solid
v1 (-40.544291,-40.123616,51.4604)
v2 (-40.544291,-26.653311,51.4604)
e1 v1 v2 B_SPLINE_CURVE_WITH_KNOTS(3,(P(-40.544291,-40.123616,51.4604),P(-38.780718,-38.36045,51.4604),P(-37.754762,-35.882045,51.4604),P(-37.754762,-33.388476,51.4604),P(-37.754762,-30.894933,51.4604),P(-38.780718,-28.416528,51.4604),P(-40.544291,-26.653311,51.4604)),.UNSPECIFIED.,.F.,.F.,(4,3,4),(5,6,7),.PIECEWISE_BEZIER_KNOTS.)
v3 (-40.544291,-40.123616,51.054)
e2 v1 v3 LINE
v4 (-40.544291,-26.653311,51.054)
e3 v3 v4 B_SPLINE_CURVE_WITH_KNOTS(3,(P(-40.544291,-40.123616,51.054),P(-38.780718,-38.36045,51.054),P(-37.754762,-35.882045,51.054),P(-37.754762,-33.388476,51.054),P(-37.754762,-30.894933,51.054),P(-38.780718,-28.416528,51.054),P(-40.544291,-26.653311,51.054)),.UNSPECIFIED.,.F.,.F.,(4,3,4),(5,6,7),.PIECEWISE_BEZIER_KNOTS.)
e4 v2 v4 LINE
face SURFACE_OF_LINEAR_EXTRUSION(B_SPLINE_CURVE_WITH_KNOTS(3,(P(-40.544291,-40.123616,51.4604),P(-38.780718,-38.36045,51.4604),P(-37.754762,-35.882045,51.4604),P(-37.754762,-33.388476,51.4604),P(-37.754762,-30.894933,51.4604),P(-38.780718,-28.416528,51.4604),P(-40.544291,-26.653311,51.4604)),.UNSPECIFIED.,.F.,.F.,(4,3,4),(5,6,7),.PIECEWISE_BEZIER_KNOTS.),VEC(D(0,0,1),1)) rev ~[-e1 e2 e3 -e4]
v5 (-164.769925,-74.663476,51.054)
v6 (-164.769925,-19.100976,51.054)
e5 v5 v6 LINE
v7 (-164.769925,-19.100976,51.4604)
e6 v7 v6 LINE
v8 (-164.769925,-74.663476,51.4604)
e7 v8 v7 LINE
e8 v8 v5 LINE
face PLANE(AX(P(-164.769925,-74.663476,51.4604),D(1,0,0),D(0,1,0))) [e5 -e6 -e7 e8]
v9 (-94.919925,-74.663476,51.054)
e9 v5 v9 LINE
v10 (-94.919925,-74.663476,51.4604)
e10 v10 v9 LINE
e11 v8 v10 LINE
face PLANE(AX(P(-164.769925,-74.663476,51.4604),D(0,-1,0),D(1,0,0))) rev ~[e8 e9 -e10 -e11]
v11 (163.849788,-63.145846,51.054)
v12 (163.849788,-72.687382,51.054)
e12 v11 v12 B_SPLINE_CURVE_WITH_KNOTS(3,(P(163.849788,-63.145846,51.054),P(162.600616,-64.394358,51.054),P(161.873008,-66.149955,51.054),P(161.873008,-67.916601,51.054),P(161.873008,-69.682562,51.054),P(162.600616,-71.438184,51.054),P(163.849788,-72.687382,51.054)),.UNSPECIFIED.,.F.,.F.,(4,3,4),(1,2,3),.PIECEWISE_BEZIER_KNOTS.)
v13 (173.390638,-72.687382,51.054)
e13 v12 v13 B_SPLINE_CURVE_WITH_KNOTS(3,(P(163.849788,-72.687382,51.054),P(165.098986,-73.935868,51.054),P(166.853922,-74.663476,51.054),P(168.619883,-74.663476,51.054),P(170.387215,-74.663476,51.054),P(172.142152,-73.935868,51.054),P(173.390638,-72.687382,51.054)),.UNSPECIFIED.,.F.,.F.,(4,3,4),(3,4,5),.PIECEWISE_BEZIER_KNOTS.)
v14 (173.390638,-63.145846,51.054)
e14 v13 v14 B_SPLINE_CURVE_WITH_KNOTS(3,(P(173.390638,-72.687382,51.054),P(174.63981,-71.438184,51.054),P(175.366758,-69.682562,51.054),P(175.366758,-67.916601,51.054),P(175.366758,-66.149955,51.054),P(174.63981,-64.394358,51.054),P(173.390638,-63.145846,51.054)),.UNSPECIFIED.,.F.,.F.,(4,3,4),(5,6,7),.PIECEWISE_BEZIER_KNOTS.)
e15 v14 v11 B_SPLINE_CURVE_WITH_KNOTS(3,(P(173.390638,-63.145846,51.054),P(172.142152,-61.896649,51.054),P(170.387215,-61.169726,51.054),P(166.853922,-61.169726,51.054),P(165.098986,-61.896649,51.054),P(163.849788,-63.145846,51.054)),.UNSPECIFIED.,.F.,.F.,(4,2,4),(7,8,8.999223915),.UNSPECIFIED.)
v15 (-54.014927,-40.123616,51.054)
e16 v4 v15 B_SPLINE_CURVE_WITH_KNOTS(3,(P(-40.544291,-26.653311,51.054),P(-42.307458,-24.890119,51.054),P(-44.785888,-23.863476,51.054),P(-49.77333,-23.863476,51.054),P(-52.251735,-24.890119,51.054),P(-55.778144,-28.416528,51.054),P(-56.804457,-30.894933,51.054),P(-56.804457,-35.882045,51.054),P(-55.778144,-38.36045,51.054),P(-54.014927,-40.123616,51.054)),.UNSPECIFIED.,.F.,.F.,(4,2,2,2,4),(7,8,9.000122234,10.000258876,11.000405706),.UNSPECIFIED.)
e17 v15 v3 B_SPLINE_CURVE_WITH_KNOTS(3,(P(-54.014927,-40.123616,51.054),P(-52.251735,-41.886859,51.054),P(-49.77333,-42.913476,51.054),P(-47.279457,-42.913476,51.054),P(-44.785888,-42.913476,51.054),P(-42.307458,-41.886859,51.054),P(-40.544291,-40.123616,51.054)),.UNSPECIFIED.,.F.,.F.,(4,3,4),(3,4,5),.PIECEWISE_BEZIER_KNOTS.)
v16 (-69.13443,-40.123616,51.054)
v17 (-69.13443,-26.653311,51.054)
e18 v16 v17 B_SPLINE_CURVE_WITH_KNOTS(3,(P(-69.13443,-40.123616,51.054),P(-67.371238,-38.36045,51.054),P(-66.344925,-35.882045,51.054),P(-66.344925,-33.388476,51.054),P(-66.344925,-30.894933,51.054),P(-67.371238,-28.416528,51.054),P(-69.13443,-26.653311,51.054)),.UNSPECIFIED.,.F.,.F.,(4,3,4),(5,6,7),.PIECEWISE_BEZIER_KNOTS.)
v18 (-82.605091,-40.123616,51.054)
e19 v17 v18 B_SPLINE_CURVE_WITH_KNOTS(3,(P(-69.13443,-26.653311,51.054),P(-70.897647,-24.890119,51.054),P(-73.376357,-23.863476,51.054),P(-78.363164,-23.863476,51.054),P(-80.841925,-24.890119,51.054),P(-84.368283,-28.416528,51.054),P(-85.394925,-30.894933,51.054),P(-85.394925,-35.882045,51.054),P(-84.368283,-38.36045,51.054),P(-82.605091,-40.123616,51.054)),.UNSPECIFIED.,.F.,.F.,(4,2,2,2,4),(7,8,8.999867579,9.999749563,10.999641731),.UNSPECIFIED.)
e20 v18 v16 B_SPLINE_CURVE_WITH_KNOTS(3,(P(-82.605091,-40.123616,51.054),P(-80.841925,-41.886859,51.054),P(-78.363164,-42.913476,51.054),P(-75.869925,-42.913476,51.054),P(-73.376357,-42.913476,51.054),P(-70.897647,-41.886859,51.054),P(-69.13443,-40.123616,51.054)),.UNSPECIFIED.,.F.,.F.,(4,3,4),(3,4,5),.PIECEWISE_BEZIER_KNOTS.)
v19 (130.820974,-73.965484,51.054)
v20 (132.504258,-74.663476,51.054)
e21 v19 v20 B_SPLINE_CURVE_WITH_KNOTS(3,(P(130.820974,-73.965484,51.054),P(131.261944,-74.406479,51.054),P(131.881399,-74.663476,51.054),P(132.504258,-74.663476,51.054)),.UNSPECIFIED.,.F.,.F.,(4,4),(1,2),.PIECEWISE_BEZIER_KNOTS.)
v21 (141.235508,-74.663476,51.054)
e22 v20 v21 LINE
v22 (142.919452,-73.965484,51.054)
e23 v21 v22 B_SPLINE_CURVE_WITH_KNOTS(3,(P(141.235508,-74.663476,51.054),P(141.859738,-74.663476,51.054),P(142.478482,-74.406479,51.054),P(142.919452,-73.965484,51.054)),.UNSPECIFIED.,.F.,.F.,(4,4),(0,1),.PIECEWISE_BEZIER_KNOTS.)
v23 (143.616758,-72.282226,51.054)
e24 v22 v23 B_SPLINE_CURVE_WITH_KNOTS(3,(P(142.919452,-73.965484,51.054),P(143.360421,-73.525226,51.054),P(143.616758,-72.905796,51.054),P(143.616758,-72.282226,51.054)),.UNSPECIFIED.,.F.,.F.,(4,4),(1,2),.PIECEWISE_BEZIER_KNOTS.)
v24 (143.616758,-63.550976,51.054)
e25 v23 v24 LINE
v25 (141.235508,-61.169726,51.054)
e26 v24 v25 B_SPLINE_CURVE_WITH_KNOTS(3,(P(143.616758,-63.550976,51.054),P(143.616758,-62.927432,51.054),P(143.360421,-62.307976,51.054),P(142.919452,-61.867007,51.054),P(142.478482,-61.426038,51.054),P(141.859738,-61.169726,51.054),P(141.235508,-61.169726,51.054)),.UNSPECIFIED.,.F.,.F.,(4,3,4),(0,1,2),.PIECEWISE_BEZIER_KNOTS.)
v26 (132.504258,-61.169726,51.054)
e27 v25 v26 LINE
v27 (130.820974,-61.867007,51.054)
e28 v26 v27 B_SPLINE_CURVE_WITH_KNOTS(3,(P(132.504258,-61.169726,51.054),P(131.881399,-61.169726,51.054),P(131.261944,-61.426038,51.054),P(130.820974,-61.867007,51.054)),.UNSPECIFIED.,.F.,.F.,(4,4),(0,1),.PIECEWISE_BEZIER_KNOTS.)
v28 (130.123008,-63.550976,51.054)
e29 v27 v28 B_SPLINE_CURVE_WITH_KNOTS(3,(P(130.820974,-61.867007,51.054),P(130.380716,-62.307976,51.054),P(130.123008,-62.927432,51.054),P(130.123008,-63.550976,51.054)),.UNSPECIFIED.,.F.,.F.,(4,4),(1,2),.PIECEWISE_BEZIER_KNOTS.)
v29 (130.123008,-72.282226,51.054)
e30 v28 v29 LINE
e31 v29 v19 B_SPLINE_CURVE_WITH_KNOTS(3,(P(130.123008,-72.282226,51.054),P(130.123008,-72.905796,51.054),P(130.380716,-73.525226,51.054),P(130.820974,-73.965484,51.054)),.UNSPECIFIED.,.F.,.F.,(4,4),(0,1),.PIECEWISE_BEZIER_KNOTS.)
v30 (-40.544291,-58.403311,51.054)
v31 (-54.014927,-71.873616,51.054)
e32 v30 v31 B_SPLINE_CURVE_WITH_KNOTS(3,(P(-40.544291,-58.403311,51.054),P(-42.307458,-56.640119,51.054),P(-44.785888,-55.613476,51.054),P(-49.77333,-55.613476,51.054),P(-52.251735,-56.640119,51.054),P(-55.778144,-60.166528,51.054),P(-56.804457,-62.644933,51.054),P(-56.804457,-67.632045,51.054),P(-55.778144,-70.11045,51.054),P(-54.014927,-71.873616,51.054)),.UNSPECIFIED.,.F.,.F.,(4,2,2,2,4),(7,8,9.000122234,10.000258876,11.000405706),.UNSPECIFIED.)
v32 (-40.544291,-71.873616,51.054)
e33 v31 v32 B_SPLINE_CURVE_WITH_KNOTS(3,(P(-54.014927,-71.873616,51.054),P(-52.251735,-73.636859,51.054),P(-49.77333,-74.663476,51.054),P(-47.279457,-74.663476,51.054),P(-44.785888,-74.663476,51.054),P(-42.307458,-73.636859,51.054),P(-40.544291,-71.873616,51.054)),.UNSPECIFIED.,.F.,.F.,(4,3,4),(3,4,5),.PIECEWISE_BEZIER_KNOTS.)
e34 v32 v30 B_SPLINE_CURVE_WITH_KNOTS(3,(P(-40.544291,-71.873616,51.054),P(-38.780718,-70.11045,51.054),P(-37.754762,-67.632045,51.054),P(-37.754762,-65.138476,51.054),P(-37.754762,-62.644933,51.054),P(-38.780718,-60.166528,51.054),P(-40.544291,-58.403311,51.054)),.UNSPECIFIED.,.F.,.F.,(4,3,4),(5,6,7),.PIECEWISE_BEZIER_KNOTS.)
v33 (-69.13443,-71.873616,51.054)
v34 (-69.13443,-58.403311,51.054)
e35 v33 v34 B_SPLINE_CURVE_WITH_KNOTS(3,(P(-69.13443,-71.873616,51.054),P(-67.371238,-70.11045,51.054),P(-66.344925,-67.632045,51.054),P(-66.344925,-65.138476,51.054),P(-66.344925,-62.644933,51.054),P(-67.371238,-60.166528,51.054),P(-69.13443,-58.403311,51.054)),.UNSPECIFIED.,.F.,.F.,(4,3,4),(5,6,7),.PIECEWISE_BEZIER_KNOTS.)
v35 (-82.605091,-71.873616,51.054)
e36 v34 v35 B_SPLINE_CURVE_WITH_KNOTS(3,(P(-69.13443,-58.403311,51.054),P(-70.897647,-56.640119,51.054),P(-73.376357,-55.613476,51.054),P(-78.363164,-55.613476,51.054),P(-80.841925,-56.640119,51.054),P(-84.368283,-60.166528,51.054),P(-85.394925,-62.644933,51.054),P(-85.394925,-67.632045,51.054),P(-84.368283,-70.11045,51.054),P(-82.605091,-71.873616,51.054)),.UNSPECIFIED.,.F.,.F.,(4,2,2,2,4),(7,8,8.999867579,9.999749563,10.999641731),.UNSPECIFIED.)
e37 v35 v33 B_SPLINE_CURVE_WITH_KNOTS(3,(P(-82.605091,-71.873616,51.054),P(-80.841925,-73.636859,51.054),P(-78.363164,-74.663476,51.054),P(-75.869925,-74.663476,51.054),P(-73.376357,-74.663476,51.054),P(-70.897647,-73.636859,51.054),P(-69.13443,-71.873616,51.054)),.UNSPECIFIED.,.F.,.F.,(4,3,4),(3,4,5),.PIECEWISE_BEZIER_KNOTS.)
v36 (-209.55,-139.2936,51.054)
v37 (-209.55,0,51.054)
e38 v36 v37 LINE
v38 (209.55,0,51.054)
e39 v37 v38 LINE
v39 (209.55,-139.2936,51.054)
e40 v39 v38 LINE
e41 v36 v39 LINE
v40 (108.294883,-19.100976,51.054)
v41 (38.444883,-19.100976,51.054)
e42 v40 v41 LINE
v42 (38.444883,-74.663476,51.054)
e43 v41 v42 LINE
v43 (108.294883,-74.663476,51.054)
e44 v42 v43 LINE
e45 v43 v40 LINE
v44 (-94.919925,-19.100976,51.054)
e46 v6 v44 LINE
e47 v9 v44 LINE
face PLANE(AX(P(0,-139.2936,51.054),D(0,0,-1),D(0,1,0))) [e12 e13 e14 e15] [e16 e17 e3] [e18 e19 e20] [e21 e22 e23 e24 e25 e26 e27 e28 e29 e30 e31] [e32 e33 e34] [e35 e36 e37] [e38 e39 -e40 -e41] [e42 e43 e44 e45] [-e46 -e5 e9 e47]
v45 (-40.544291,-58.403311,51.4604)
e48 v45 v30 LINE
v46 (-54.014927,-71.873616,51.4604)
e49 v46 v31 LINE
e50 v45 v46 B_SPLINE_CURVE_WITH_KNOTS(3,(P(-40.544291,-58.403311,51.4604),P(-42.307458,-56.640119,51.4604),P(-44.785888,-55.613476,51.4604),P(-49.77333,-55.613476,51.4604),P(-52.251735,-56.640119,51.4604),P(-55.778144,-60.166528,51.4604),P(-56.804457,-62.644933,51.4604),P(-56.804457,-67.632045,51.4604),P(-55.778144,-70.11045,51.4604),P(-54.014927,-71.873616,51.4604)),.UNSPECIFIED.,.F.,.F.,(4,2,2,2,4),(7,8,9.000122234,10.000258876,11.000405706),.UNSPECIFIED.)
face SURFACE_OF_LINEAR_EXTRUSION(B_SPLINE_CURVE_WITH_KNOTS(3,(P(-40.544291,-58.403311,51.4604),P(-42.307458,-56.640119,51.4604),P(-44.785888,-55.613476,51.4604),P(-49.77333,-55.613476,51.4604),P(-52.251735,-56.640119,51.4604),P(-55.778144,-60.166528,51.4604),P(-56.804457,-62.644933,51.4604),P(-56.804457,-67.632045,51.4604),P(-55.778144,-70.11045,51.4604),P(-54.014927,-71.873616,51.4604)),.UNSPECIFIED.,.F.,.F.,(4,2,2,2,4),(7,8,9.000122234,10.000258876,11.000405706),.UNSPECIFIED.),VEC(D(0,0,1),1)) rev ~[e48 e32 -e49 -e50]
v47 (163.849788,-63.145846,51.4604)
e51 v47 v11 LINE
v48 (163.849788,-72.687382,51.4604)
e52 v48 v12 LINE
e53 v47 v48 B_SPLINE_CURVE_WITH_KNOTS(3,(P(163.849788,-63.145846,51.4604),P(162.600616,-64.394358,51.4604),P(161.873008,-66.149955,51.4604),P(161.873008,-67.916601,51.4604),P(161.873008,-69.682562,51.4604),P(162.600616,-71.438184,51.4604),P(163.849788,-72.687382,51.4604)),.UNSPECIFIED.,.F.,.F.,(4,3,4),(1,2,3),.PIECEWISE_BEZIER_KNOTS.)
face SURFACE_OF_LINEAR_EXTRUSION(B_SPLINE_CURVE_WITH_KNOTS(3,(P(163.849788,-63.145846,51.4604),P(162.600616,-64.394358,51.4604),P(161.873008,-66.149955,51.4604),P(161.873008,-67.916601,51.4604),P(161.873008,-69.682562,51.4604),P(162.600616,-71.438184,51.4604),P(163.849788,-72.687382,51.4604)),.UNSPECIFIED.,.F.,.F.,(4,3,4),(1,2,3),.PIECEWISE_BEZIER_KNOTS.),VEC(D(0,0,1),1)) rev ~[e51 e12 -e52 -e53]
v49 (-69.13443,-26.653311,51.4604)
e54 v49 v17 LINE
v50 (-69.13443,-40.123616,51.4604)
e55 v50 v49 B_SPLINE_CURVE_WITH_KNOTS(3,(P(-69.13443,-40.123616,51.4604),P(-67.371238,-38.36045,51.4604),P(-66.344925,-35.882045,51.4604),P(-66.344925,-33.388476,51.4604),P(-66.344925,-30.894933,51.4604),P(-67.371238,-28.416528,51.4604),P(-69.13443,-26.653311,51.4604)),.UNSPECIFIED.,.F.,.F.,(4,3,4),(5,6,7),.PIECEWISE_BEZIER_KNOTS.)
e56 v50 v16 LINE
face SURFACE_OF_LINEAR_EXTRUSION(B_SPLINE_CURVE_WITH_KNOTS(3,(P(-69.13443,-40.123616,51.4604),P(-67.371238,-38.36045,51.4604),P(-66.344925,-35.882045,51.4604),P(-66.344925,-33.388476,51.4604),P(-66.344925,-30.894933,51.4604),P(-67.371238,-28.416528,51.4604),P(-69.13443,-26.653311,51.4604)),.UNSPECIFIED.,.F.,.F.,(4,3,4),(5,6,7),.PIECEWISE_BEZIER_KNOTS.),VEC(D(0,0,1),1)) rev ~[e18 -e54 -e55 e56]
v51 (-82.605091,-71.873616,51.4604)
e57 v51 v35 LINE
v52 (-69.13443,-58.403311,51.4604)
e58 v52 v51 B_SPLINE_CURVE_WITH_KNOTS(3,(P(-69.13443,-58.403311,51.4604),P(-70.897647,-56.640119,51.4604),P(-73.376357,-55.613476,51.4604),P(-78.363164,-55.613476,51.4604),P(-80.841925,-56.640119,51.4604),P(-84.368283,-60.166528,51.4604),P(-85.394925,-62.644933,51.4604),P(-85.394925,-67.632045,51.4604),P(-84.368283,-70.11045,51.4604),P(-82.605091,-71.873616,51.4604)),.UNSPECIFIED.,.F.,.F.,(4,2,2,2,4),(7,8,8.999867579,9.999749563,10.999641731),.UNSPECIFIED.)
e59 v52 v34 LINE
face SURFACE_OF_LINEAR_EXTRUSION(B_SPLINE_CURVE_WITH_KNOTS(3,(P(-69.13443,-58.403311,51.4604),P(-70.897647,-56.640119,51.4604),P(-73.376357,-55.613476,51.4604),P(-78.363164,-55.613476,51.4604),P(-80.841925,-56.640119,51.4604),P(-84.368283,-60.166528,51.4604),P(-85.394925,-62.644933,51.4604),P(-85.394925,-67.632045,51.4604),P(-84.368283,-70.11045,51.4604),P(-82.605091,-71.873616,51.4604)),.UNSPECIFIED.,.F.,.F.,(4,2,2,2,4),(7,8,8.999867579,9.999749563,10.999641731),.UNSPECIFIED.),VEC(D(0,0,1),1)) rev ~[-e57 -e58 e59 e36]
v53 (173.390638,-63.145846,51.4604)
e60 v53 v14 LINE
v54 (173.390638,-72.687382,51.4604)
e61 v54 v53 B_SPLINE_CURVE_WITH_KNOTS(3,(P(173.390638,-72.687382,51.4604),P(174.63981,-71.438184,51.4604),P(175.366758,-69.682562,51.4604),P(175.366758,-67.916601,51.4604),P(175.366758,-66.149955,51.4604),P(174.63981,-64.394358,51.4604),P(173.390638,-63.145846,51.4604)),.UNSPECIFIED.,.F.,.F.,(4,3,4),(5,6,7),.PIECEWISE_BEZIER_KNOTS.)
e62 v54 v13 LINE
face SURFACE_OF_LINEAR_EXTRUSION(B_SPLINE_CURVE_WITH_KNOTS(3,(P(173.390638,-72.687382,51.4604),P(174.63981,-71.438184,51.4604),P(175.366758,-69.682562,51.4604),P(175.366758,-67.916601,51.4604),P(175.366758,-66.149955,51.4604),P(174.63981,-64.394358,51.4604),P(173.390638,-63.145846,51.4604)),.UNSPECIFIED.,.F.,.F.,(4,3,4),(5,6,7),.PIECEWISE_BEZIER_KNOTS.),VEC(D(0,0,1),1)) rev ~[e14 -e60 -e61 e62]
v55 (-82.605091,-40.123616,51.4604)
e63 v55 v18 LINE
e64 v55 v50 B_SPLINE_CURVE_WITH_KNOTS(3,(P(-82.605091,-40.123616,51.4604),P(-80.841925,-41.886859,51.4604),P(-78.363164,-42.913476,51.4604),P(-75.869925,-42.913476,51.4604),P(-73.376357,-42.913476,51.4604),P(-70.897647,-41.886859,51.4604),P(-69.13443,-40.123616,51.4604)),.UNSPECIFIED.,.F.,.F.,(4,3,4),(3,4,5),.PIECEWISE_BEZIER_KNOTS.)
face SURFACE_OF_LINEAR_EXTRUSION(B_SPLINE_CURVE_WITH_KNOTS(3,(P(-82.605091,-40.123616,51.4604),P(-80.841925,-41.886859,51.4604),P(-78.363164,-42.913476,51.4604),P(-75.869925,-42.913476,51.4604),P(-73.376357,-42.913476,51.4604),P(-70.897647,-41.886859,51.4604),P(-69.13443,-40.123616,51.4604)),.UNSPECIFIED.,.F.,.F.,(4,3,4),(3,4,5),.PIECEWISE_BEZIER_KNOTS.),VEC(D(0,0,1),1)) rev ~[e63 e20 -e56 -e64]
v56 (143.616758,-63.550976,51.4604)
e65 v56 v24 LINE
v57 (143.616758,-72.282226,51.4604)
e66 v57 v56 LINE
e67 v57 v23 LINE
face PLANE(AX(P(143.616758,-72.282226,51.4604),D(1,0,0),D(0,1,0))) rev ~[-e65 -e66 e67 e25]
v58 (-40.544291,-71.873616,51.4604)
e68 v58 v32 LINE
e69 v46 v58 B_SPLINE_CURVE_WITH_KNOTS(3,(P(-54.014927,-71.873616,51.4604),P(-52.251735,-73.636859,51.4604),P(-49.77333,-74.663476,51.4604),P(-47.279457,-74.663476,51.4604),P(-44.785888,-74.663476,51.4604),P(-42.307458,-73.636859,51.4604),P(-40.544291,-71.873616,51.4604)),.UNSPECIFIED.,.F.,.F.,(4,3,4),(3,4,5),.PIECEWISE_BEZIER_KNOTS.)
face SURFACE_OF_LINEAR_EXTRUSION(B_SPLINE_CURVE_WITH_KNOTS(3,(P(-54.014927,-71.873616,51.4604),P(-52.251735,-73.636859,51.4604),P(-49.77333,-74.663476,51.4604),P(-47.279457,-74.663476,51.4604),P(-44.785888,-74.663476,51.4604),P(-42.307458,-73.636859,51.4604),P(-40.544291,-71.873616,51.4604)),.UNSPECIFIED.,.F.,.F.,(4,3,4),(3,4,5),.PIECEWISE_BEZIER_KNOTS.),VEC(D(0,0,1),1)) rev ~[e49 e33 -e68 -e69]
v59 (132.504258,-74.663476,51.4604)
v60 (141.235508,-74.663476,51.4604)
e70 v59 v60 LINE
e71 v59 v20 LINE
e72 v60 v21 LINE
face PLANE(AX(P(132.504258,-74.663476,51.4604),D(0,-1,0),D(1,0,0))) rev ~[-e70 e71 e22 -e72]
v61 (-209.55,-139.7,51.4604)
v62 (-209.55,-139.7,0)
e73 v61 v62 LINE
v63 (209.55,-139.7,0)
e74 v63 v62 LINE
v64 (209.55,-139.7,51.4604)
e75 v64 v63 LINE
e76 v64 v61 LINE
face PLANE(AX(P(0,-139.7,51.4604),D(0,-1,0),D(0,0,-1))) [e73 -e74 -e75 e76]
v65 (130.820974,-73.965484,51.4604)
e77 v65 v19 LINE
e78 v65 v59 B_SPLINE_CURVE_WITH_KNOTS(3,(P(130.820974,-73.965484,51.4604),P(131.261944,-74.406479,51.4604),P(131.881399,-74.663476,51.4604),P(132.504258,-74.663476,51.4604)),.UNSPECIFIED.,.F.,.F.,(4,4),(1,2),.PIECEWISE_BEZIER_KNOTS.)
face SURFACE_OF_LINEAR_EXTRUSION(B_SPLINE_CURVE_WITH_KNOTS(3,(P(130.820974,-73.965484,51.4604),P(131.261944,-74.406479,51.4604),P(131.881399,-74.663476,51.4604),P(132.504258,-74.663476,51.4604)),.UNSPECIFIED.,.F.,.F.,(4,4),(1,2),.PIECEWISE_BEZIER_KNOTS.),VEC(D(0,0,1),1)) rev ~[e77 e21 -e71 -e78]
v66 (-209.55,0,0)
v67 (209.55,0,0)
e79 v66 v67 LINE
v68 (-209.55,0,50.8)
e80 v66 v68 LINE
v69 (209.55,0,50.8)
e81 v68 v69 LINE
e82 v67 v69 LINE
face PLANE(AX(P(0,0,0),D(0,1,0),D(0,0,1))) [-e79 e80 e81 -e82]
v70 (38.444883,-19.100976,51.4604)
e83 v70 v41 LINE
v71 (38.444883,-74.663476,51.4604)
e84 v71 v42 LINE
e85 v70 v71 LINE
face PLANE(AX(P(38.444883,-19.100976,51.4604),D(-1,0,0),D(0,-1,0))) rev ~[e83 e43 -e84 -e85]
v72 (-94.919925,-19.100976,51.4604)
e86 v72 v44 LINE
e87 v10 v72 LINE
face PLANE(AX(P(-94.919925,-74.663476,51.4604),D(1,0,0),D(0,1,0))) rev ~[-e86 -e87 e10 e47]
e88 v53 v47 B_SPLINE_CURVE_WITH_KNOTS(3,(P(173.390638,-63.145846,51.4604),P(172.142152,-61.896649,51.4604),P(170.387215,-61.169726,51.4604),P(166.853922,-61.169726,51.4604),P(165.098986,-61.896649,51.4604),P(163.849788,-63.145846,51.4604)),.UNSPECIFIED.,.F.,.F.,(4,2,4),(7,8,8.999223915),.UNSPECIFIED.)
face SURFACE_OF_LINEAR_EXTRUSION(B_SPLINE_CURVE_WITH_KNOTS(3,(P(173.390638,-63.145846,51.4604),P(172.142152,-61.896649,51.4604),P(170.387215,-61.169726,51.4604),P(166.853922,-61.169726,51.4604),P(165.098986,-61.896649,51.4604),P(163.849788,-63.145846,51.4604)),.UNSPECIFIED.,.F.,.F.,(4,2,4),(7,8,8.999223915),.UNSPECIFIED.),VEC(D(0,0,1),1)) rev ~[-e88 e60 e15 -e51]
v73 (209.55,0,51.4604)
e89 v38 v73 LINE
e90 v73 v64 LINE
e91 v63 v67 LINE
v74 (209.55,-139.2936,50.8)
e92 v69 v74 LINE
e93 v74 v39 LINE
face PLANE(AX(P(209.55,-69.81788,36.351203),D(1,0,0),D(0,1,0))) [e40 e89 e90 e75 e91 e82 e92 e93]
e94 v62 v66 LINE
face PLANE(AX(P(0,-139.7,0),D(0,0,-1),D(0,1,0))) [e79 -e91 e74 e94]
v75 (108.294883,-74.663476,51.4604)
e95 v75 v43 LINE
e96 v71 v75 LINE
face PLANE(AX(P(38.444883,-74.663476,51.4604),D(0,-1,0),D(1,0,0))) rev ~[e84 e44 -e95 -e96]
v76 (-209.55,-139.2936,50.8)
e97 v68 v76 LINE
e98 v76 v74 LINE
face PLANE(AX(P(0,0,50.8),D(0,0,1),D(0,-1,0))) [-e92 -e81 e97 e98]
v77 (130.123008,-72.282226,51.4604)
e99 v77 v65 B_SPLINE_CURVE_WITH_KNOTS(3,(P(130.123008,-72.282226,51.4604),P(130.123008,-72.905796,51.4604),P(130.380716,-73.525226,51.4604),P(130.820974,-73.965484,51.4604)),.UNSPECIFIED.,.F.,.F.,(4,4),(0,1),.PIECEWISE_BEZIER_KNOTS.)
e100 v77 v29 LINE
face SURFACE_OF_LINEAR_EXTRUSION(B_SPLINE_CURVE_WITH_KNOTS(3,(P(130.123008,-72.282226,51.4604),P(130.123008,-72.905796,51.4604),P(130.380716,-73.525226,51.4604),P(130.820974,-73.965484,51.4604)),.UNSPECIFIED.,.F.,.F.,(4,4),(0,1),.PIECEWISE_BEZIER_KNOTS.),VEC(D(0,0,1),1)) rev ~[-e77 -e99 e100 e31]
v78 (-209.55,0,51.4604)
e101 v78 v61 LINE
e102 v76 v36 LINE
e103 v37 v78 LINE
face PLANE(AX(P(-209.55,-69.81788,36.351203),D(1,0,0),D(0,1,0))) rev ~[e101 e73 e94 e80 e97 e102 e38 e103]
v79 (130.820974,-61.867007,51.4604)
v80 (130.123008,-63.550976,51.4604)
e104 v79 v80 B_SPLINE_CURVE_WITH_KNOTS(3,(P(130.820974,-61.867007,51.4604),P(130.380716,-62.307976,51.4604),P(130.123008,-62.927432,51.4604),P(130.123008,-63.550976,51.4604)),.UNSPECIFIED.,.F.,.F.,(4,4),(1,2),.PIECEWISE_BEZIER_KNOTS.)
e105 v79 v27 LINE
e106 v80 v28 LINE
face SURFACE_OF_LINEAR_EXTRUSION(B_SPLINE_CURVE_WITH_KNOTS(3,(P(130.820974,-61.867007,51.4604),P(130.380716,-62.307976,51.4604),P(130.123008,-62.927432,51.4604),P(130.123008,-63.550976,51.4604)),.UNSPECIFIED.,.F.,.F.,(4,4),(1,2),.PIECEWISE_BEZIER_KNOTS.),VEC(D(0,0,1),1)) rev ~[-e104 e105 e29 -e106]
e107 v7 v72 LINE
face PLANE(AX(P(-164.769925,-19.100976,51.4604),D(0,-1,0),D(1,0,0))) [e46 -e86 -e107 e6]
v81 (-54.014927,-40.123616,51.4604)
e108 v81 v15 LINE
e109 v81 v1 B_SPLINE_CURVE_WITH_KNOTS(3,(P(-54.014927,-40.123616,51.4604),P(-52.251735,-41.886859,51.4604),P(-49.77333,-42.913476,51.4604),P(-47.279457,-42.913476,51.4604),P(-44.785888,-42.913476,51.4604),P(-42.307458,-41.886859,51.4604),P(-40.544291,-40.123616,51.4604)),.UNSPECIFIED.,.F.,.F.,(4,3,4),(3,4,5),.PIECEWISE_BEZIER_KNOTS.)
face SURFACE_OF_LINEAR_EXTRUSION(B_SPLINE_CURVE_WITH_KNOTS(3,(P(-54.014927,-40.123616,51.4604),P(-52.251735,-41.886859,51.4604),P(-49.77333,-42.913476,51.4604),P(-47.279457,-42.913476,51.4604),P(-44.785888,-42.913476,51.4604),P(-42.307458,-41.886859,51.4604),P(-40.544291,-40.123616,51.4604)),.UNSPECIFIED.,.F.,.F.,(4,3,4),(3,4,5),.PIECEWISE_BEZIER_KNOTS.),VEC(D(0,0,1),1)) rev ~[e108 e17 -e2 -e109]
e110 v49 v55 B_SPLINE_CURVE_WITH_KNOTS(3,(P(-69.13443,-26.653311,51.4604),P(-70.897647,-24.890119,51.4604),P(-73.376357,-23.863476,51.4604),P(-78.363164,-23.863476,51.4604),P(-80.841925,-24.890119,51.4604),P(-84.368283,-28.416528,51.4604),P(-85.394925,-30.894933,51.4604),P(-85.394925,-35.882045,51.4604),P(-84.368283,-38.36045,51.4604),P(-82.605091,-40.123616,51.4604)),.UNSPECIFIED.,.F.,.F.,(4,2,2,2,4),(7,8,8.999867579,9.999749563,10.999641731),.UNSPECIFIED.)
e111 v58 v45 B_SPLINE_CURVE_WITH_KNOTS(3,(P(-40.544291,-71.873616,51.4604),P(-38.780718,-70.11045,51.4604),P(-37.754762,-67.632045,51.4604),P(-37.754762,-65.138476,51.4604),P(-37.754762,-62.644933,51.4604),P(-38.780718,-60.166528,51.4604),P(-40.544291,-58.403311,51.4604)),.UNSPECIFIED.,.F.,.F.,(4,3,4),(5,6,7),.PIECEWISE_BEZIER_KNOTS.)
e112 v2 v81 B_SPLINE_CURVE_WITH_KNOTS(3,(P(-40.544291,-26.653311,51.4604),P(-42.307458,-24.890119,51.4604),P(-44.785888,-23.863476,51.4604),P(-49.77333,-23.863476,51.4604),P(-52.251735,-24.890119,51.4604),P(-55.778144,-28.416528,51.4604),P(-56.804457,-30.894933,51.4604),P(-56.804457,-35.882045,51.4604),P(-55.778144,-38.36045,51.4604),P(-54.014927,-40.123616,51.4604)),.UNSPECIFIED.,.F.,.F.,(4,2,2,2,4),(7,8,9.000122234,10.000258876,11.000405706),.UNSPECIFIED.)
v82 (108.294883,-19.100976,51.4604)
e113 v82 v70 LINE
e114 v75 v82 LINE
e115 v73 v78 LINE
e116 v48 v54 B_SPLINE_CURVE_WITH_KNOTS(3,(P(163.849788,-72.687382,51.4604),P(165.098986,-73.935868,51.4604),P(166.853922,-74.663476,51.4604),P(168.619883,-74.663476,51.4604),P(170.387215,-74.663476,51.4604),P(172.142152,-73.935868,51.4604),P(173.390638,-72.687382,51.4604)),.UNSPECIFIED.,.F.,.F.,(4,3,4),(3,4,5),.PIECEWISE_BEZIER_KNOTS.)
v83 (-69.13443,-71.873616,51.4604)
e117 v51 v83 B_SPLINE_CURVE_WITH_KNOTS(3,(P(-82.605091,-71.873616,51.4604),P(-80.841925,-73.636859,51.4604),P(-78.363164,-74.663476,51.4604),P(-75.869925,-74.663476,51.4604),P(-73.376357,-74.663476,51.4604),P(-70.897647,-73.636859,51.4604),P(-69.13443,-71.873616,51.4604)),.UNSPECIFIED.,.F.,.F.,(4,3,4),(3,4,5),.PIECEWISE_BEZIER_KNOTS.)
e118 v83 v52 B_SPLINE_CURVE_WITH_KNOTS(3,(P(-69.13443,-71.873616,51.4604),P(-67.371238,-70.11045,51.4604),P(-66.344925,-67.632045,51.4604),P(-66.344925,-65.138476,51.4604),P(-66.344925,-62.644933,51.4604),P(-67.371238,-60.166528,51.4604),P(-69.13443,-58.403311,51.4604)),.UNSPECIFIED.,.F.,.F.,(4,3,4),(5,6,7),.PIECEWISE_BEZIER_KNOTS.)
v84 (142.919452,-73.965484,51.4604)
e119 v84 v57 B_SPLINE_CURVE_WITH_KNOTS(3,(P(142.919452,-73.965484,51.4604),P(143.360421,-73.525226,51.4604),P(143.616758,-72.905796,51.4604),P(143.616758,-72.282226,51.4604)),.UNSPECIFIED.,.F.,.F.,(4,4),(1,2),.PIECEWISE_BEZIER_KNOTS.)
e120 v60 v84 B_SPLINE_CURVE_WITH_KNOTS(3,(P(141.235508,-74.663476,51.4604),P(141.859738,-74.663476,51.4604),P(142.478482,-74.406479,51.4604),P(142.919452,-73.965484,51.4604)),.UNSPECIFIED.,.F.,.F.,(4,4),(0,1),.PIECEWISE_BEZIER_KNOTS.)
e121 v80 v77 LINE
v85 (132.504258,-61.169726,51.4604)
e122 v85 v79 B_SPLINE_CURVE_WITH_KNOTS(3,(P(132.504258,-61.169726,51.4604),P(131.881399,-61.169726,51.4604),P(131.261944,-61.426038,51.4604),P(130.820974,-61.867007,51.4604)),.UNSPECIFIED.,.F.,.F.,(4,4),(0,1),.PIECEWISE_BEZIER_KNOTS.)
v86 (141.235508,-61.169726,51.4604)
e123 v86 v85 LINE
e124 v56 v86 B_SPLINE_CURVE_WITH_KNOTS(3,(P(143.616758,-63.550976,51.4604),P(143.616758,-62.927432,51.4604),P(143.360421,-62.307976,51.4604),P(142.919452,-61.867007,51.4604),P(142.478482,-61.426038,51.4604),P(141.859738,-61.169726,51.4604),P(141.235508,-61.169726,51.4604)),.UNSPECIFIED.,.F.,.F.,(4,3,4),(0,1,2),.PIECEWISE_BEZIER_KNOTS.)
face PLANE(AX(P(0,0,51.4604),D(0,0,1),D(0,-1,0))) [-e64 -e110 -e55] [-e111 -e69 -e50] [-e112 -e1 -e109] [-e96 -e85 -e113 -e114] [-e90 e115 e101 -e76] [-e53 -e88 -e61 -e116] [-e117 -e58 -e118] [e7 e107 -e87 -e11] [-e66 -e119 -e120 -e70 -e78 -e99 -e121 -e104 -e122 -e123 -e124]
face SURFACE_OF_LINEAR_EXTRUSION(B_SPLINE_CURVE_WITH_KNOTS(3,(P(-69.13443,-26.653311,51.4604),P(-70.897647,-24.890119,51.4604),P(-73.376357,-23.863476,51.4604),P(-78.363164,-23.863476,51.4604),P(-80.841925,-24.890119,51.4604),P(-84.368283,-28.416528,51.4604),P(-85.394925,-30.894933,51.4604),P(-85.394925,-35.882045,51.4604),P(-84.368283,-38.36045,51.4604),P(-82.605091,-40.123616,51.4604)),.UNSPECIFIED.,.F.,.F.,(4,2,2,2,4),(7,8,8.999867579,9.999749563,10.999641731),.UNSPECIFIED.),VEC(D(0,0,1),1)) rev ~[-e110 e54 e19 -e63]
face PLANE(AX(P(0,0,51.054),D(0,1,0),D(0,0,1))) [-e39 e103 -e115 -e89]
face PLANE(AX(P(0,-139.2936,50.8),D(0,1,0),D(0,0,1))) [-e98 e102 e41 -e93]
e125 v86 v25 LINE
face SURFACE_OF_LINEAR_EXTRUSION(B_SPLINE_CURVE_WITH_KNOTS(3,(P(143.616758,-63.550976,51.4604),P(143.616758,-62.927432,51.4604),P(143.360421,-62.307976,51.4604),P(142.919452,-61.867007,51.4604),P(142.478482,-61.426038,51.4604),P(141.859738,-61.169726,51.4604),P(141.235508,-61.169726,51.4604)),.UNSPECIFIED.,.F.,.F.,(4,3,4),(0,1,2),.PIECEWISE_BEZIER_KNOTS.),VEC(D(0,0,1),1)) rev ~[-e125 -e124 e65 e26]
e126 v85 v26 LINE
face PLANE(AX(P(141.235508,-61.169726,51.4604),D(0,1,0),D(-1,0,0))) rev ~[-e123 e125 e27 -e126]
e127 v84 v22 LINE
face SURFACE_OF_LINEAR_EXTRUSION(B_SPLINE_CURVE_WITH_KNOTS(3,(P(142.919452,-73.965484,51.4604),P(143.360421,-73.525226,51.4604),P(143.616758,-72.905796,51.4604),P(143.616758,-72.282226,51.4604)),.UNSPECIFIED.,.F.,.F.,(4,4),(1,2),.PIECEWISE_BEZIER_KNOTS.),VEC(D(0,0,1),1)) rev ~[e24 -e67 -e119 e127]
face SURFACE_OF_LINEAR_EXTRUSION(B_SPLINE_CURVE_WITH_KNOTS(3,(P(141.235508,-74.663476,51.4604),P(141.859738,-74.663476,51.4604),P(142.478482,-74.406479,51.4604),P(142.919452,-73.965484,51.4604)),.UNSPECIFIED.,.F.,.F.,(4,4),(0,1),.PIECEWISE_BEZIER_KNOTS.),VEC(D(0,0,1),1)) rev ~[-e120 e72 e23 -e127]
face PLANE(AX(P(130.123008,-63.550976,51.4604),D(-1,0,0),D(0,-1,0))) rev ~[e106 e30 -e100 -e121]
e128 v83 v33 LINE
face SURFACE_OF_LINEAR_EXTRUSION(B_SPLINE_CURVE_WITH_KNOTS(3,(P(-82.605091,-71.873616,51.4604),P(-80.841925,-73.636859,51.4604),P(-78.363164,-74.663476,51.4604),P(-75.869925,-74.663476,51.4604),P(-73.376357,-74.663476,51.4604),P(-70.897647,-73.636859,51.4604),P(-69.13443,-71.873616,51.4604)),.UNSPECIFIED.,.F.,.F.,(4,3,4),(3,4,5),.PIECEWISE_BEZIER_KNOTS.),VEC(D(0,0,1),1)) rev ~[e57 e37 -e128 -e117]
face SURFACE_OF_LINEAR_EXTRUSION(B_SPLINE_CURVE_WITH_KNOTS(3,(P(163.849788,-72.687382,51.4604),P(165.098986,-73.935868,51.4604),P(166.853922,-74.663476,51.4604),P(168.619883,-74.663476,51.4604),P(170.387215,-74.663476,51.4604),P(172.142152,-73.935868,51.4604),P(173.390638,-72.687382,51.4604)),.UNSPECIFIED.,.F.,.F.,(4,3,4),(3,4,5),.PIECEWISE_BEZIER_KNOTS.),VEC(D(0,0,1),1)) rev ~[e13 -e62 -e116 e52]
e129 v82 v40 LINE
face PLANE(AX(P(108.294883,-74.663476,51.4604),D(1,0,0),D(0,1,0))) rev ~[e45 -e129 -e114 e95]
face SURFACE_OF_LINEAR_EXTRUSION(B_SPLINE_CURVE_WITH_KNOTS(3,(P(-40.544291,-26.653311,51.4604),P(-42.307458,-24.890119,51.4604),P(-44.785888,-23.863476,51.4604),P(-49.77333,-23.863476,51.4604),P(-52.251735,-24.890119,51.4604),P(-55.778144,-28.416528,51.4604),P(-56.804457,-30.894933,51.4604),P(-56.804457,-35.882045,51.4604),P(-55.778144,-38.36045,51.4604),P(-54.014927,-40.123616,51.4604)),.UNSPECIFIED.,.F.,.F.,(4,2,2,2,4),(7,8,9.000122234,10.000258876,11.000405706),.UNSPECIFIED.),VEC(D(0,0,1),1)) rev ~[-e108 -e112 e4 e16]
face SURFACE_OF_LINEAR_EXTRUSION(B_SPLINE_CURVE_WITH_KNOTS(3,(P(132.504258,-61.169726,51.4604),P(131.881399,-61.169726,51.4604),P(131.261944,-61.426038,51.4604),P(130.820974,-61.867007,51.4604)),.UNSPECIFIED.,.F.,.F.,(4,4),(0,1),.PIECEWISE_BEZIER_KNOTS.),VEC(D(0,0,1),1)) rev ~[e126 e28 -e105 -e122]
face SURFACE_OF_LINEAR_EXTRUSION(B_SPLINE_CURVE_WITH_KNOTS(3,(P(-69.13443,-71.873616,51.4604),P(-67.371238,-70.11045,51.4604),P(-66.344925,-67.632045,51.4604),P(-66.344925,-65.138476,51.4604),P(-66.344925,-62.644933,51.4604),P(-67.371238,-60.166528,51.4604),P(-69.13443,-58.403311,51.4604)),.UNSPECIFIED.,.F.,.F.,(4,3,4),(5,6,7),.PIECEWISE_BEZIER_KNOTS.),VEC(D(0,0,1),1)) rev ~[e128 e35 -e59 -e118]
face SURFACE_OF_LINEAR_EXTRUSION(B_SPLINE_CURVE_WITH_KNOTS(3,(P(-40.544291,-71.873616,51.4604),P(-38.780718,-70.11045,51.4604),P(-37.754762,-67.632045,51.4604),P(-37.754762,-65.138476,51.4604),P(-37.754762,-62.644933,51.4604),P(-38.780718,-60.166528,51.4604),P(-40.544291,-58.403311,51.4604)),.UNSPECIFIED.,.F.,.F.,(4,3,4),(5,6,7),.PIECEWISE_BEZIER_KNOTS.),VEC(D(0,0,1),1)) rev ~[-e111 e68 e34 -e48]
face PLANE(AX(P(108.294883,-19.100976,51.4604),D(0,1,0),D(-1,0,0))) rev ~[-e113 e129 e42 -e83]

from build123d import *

# Parameters (mm, degrees)
F1_DEPTH = 209.55
F2_W     = 69.85
F2_H     = 55.5625
F3_DEPTH = 0.4064


# Not quite as in the source:
# - the dataset's text gives a spline's control points without its knots; the knots are read off the source's solid


with BuildPart() as f1:
    # F0 (on Right) → F1 (new body, symmetric)
    with BuildSketch(Plane.YZ):
        Polygon((-139.7, 0), (0, 0), (0, 50.8), (-139.2936, 50.8), (-139.2936, 51.054), (0, 51.054), (0, 51.4604), (-139.7, 51.4604), align=None)
    extrude(amount=F1_DEPTH, both=True)

    # F2 (on face) → F3 (cut, through all)
    with BuildSketch(Plane.XY.offset(51.4604)):
        with Locations((-129.8449253923, -46.8822261976)):
            Rectangle(F2_W, F2_H)
        Polygon((108.2948828077, -19.1009761976), (38.4448828077, -19.1009761976), (38.4448828077, -74.6634761976), (108.2948828077, -74.6634761976), (108.2948828077, -68.4133743976), (108.2948828077, -42.0156877976), align=None)
        with BuildLine():
            add(Edge.make_bspline(
                [(130.8209744077, -61.8670069976), (130.3807162077, -62.3079763976), (130.1230078077, -62.9274315976), (130.1230078077, -63.5509761976)],
                knots=[1, 1, 1, 1, 2, 2, 2, 2], degree=3))
            Line((130.1230078077, -63.5509761976), (130.1230078077, -72.2822261976))
            add(Edge.make_bspline(
                [(130.1230078077, -72.2822261976), (130.1230078077, -72.9057961976), (130.3807162077, -73.5252259976), (130.8209744077, -73.9654841976)],
                knots=[0, 0, 0, 0, 1, 1, 1, 1], degree=3))
            add(Edge.make_bspline(
                [(130.8209744077, -73.9654841976), (131.2619438077, -74.4064789976), (131.8813990077, -74.6634761976), (132.5042578077, -74.6634761976)],
                knots=[1, 1, 1, 1, 2, 2, 2, 2], degree=3))
            Line((132.5042578077, -74.6634761976), (141.2355078077, -74.6634761976))
            add(Edge.make_bspline(
                [(141.2355078077, -74.6634761976), (141.8597382077, -74.6634761976), (142.4784822077, -74.4064789976), (142.9194516077, -73.9654841976)],
                knots=[0, 0, 0, 0, 1, 1, 1, 1], degree=3))
            add(Edge.make_bspline(
                [(142.9194516077, -73.9654841976), (143.3604210077, -73.5252259976), (143.6167578077, -72.9057961976), (143.6167578077, -72.2822261976)],
                knots=[1, 1, 1, 1, 2, 2, 2, 2], degree=3))
            Line((143.6167578077, -72.2822261976), (143.6167578077, -63.5509761976))
            add(Edge.make_bspline(
                [(143.6167578077, -63.5509761976), (143.6167578077, -62.9274315976), (143.3604210077, -62.3079763976), (142.9194516077, -61.8670069976), (142.4784822077, -61.4260375976), (141.8597382077, -61.1697261976), (141.2355078077, -61.1697261976)],
                knots=[0, 0, 0, 0, 1, 1, 1, 2, 2, 2, 2], degree=3))
            Line((141.2355078077, -61.1697261976), (132.5042578077, -61.1697261976))
            add(Edge.make_bspline(
                [(132.5042578077, -61.1697261976), (131.8813990077, -61.1697261976), (131.2619438077, -61.4260375976), (130.8209744077, -61.8670069976)],
                knots=[0, 0, 0, 0, 1, 1, 1, 1], degree=3))
        make_face()
        with BuildLine():
            add(Edge.make_bspline(
                [(-69.1344295923, -26.6533105976), (-70.8976467923, -24.8901187976), (-73.3763565923, -23.8634761976), (-75.8699253923, -23.8634761976)],
                knots=[7, 7, 7, 7, 8, 8, 8, 8], degree=3))
            add(Edge.make_bspline(
                [(-75.8699253923, -23.8634761976), (-78.3631639923, -23.8634761976), (-80.8419245923, -24.8901187976), (-82.6050909923, -26.6533105976), (-84.3682827923, -28.4165277976), (-85.3949253923, -30.8949327976), (-85.3949253923, -33.3884761976), (-85.3949253923, -35.8820449976), (-84.3682827923, -38.3604499976), (-82.6050909923, -40.1236163976)],
                knots=[0, 0, 0, 0, 1, 1, 1, 2, 2, 2, 3, 3, 3, 3], degree=3))
            add(Edge.make_bspline(
                [(-82.6050909923, -40.1236163976), (-80.8419245923, -41.8868589976), (-78.3631639923, -42.9134761976), (-75.8699253923, -42.9134761976), (-73.3763565923, -42.9134761976), (-70.8976467923, -41.8868589976), (-69.1344295923, -40.1236163976)],
                knots=[3, 3, 3, 3, 4, 4, 4, 5, 5, 5, 5], degree=3))
            add(Edge.make_bspline(
                [(-69.1344295923, -40.1236163976), (-67.3712377923, -38.3604499976), (-66.3449253923, -35.8820449976), (-66.3449253923, -33.3884761976), (-66.3449253923, -30.8949327976), (-67.3712377923, -28.4165277976), (-69.1344295923, -26.6533105976)],
                knots=[5, 5, 5, 5, 6, 6, 6, 7, 7, 7, 7], degree=3))
        make_face()
        with BuildLine():
            add(Edge.make_bspline(
                [(-69.1344295923, -58.4033105976), (-70.8976467923, -56.6401187976), (-73.3763565923, -55.6134761976), (-75.8699253923, -55.6134761976)],
                knots=[7, 7, 7, 7, 8, 8, 8, 8], degree=3))
            add(Edge.make_bspline(
                [(-75.8699253923, -55.6134761976), (-78.3631639923, -55.6134761976), (-80.8419245923, -56.6401187976), (-82.6050909923, -58.4033105976), (-84.3682827923, -60.1665277976), (-85.3949253923, -62.6449327976), (-85.3949253923, -65.1384761976), (-85.3949253923, -67.6320449976), (-84.3682827923, -70.1104499976), (-82.6050909923, -71.8736163976)],
                knots=[0, 0, 0, 0, 1, 1, 1, 2, 2, 2, 3, 3, 3, 3], degree=3))
            add(Edge.make_bspline(
                [(-82.6050909923, -71.8736163976), (-80.8419245923, -73.6368589976), (-78.3631639923, -74.6634761976), (-75.8699253923, -74.6634761976), (-73.3763565923, -74.6634761976), (-70.8976467923, -73.6368589976), (-69.1344295923, -71.8736163976)],
                knots=[3, 3, 3, 3, 4, 4, 4, 5, 5, 5, 5], degree=3))
            add(Edge.make_bspline(
                [(-69.1344295923, -71.8736163976), (-67.3712377923, -70.1104499976), (-66.3449253923, -67.6320449976), (-66.3449253923, -65.1384761976), (-66.3449253923, -62.6449327976), (-67.3712377923, -60.1665277976), (-69.1344295923, -58.4033105976)],
                knots=[5, 5, 5, 5, 6, 6, 6, 7, 7, 7, 7], degree=3))
        make_face()
        with BuildLine():
            add(Edge.make_bspline(
                [(-40.5442911923, -58.4033105976), (-42.3074575923, -56.6401187976), (-44.7858879923, -55.6134761976), (-47.2794567923, -55.6134761976)],
                knots=[7, 7, 7, 7, 8, 8, 8, 8], degree=3))
            add(Edge.make_bspline(
                [(-47.2794567923, -55.6134761976), (-49.7733303923, -55.6134761976), (-52.2517353923, -56.6401187976), (-54.0149271923, -58.4033105976), (-55.7781443923, -60.1665277976), (-56.8044567923, -62.6449327976), (-56.8044567923, -65.1384761976), (-56.8044567923, -67.6320449976), (-55.7781443923, -70.1104499976), (-54.0149271923, -71.8736163976)],
                knots=[0, 0, 0, 0, 1, 1, 1, 2, 2, 2, 3, 3, 3, 3], degree=3))
            add(Edge.make_bspline(
                [(-54.0149271923, -71.8736163976), (-52.2517353923, -73.6368589976), (-49.7733303923, -74.6634761976), (-47.2794567923, -74.6634761976), (-44.7858879923, -74.6634761976), (-42.3074575923, -73.6368589976), (-40.5442911923, -71.8736163976)],
                knots=[3, 3, 3, 3, 4, 4, 4, 5, 5, 5, 5], degree=3))
            add(Edge.make_bspline(
                [(-40.5442911923, -71.8736163976), (-38.7807183923, -70.1104499976), (-37.7547615923, -67.6320449976), (-37.7547615923, -65.1384761976), (-37.7547615923, -62.6449327976), (-38.7807183923, -60.1665277976), (-40.5442911923, -58.4033105976)],
                knots=[5, 5, 5, 5, 6, 6, 6, 7, 7, 7, 7], degree=3))
        make_face()
        with BuildLine():
            add(Edge.make_bspline(
                [(-40.5442911923, -26.6533105976), (-42.3074575923, -24.8901187976), (-44.7858879923, -23.8634761976), (-47.2794567923, -23.8634761976)],
                knots=[7, 7, 7, 7, 8, 8, 8, 8], degree=3))
            add(Edge.make_bspline(
                [(-47.2794567923, -23.8634761976), (-49.7733303923, -23.8634761976), (-52.2517353923, -24.8901187976), (-54.0149271923, -26.6533105976), (-55.7781443923, -28.4165277976), (-56.8044567923, -30.8949327976), (-56.8044567923, -33.3884761976), (-56.8044567923, -35.8820449976), (-55.7781443923, -38.3604499976), (-54.0149271923, -40.1236163976)],
                knots=[0, 0, 0, 0, 1, 1, 1, 2, 2, 2, 3, 3, 3, 3], degree=3))
            add(Edge.make_bspline(
                [(-54.0149271923, -40.1236163976), (-52.2517353923, -41.8868589976), (-49.7733303923, -42.9134761976), (-47.2794567923, -42.9134761976), (-44.7858879923, -42.9134761976), (-42.3074575923, -41.8868589976), (-40.5442911923, -40.1236163976)],
                knots=[3, 3, 3, 3, 4, 4, 4, 5, 5, 5, 5], degree=3))
            add(Edge.make_bspline(
                [(-40.5442911923, -40.1236163976), (-38.7807183923, -38.3604499976), (-37.7547615923, -35.8820449976), (-37.7547615923, -33.3884761976), (-37.7547615923, -30.8949327976), (-38.7807183923, -28.4165277976), (-40.5442911923, -26.6533105976)],
                knots=[5, 5, 5, 5, 6, 6, 6, 7, 7, 7, 7], degree=3))
        make_face()
        with BuildLine():
            add(Edge.make_bspline(
                [(173.3906378077, -63.1458461976), (172.1421516077, -61.8966487976), (170.3872148077, -61.1697261976), (168.6198828077, -61.1697261976)],
                knots=[7, 7, 7, 7, 8, 8, 8, 8], degree=3))
            add(Edge.make_bspline(
                [(168.6198828077, -61.1697261976), (166.8539224077, -61.1697261976), (165.0989856077, -61.8966487976), (163.8497882077, -63.1458461976)],
                knots=[0, 0, 0, 0, 1, 1, 1, 1], degree=3))
            add(Edge.make_bspline(
                [(163.8497882077, -63.1458461976), (162.6006162077, -64.3943577976), (161.8730078077, -66.1499549976), (161.8730078077, -67.9166011976), (161.8730078077, -69.6825615976), (162.6006162077, -71.4381841976), (163.8497882077, -72.6873815976)],
                knots=[1, 1, 1, 1, 2, 2, 2, 3, 3, 3, 3], degree=3))
            add(Edge.make_bspline(
                [(163.8497882077, -72.6873815976), (165.0989856077, -73.9358677976), (166.8539224077, -74.6634761976), (168.6198828077, -74.6634761976), (170.3872148077, -74.6634761976), (172.1421516077, -73.9358677976), (173.3906378077, -72.6873815976)],
                knots=[3, 3, 3, 3, 4, 4, 4, 5, 5, 5, 5], degree=3))
            add(Edge.make_bspline(
                [(173.3906378077, -72.6873815976), (174.6398098077, -71.4381841976), (175.3667578077, -69.6825615976), (175.3667578077, -67.9166011976), (175.3667578077, -66.1499549976), (174.6398098077, -64.3943577976), (173.3906378077, -63.1458461976)],
                knots=[5, 5, 5, 5, 6, 6, 6, 7, 7, 7, 7], degree=3))
        make_face()
    extrude(amount=-F3_DEPTH, mode=Mode.SUBTRACT)


solid = f1.part
